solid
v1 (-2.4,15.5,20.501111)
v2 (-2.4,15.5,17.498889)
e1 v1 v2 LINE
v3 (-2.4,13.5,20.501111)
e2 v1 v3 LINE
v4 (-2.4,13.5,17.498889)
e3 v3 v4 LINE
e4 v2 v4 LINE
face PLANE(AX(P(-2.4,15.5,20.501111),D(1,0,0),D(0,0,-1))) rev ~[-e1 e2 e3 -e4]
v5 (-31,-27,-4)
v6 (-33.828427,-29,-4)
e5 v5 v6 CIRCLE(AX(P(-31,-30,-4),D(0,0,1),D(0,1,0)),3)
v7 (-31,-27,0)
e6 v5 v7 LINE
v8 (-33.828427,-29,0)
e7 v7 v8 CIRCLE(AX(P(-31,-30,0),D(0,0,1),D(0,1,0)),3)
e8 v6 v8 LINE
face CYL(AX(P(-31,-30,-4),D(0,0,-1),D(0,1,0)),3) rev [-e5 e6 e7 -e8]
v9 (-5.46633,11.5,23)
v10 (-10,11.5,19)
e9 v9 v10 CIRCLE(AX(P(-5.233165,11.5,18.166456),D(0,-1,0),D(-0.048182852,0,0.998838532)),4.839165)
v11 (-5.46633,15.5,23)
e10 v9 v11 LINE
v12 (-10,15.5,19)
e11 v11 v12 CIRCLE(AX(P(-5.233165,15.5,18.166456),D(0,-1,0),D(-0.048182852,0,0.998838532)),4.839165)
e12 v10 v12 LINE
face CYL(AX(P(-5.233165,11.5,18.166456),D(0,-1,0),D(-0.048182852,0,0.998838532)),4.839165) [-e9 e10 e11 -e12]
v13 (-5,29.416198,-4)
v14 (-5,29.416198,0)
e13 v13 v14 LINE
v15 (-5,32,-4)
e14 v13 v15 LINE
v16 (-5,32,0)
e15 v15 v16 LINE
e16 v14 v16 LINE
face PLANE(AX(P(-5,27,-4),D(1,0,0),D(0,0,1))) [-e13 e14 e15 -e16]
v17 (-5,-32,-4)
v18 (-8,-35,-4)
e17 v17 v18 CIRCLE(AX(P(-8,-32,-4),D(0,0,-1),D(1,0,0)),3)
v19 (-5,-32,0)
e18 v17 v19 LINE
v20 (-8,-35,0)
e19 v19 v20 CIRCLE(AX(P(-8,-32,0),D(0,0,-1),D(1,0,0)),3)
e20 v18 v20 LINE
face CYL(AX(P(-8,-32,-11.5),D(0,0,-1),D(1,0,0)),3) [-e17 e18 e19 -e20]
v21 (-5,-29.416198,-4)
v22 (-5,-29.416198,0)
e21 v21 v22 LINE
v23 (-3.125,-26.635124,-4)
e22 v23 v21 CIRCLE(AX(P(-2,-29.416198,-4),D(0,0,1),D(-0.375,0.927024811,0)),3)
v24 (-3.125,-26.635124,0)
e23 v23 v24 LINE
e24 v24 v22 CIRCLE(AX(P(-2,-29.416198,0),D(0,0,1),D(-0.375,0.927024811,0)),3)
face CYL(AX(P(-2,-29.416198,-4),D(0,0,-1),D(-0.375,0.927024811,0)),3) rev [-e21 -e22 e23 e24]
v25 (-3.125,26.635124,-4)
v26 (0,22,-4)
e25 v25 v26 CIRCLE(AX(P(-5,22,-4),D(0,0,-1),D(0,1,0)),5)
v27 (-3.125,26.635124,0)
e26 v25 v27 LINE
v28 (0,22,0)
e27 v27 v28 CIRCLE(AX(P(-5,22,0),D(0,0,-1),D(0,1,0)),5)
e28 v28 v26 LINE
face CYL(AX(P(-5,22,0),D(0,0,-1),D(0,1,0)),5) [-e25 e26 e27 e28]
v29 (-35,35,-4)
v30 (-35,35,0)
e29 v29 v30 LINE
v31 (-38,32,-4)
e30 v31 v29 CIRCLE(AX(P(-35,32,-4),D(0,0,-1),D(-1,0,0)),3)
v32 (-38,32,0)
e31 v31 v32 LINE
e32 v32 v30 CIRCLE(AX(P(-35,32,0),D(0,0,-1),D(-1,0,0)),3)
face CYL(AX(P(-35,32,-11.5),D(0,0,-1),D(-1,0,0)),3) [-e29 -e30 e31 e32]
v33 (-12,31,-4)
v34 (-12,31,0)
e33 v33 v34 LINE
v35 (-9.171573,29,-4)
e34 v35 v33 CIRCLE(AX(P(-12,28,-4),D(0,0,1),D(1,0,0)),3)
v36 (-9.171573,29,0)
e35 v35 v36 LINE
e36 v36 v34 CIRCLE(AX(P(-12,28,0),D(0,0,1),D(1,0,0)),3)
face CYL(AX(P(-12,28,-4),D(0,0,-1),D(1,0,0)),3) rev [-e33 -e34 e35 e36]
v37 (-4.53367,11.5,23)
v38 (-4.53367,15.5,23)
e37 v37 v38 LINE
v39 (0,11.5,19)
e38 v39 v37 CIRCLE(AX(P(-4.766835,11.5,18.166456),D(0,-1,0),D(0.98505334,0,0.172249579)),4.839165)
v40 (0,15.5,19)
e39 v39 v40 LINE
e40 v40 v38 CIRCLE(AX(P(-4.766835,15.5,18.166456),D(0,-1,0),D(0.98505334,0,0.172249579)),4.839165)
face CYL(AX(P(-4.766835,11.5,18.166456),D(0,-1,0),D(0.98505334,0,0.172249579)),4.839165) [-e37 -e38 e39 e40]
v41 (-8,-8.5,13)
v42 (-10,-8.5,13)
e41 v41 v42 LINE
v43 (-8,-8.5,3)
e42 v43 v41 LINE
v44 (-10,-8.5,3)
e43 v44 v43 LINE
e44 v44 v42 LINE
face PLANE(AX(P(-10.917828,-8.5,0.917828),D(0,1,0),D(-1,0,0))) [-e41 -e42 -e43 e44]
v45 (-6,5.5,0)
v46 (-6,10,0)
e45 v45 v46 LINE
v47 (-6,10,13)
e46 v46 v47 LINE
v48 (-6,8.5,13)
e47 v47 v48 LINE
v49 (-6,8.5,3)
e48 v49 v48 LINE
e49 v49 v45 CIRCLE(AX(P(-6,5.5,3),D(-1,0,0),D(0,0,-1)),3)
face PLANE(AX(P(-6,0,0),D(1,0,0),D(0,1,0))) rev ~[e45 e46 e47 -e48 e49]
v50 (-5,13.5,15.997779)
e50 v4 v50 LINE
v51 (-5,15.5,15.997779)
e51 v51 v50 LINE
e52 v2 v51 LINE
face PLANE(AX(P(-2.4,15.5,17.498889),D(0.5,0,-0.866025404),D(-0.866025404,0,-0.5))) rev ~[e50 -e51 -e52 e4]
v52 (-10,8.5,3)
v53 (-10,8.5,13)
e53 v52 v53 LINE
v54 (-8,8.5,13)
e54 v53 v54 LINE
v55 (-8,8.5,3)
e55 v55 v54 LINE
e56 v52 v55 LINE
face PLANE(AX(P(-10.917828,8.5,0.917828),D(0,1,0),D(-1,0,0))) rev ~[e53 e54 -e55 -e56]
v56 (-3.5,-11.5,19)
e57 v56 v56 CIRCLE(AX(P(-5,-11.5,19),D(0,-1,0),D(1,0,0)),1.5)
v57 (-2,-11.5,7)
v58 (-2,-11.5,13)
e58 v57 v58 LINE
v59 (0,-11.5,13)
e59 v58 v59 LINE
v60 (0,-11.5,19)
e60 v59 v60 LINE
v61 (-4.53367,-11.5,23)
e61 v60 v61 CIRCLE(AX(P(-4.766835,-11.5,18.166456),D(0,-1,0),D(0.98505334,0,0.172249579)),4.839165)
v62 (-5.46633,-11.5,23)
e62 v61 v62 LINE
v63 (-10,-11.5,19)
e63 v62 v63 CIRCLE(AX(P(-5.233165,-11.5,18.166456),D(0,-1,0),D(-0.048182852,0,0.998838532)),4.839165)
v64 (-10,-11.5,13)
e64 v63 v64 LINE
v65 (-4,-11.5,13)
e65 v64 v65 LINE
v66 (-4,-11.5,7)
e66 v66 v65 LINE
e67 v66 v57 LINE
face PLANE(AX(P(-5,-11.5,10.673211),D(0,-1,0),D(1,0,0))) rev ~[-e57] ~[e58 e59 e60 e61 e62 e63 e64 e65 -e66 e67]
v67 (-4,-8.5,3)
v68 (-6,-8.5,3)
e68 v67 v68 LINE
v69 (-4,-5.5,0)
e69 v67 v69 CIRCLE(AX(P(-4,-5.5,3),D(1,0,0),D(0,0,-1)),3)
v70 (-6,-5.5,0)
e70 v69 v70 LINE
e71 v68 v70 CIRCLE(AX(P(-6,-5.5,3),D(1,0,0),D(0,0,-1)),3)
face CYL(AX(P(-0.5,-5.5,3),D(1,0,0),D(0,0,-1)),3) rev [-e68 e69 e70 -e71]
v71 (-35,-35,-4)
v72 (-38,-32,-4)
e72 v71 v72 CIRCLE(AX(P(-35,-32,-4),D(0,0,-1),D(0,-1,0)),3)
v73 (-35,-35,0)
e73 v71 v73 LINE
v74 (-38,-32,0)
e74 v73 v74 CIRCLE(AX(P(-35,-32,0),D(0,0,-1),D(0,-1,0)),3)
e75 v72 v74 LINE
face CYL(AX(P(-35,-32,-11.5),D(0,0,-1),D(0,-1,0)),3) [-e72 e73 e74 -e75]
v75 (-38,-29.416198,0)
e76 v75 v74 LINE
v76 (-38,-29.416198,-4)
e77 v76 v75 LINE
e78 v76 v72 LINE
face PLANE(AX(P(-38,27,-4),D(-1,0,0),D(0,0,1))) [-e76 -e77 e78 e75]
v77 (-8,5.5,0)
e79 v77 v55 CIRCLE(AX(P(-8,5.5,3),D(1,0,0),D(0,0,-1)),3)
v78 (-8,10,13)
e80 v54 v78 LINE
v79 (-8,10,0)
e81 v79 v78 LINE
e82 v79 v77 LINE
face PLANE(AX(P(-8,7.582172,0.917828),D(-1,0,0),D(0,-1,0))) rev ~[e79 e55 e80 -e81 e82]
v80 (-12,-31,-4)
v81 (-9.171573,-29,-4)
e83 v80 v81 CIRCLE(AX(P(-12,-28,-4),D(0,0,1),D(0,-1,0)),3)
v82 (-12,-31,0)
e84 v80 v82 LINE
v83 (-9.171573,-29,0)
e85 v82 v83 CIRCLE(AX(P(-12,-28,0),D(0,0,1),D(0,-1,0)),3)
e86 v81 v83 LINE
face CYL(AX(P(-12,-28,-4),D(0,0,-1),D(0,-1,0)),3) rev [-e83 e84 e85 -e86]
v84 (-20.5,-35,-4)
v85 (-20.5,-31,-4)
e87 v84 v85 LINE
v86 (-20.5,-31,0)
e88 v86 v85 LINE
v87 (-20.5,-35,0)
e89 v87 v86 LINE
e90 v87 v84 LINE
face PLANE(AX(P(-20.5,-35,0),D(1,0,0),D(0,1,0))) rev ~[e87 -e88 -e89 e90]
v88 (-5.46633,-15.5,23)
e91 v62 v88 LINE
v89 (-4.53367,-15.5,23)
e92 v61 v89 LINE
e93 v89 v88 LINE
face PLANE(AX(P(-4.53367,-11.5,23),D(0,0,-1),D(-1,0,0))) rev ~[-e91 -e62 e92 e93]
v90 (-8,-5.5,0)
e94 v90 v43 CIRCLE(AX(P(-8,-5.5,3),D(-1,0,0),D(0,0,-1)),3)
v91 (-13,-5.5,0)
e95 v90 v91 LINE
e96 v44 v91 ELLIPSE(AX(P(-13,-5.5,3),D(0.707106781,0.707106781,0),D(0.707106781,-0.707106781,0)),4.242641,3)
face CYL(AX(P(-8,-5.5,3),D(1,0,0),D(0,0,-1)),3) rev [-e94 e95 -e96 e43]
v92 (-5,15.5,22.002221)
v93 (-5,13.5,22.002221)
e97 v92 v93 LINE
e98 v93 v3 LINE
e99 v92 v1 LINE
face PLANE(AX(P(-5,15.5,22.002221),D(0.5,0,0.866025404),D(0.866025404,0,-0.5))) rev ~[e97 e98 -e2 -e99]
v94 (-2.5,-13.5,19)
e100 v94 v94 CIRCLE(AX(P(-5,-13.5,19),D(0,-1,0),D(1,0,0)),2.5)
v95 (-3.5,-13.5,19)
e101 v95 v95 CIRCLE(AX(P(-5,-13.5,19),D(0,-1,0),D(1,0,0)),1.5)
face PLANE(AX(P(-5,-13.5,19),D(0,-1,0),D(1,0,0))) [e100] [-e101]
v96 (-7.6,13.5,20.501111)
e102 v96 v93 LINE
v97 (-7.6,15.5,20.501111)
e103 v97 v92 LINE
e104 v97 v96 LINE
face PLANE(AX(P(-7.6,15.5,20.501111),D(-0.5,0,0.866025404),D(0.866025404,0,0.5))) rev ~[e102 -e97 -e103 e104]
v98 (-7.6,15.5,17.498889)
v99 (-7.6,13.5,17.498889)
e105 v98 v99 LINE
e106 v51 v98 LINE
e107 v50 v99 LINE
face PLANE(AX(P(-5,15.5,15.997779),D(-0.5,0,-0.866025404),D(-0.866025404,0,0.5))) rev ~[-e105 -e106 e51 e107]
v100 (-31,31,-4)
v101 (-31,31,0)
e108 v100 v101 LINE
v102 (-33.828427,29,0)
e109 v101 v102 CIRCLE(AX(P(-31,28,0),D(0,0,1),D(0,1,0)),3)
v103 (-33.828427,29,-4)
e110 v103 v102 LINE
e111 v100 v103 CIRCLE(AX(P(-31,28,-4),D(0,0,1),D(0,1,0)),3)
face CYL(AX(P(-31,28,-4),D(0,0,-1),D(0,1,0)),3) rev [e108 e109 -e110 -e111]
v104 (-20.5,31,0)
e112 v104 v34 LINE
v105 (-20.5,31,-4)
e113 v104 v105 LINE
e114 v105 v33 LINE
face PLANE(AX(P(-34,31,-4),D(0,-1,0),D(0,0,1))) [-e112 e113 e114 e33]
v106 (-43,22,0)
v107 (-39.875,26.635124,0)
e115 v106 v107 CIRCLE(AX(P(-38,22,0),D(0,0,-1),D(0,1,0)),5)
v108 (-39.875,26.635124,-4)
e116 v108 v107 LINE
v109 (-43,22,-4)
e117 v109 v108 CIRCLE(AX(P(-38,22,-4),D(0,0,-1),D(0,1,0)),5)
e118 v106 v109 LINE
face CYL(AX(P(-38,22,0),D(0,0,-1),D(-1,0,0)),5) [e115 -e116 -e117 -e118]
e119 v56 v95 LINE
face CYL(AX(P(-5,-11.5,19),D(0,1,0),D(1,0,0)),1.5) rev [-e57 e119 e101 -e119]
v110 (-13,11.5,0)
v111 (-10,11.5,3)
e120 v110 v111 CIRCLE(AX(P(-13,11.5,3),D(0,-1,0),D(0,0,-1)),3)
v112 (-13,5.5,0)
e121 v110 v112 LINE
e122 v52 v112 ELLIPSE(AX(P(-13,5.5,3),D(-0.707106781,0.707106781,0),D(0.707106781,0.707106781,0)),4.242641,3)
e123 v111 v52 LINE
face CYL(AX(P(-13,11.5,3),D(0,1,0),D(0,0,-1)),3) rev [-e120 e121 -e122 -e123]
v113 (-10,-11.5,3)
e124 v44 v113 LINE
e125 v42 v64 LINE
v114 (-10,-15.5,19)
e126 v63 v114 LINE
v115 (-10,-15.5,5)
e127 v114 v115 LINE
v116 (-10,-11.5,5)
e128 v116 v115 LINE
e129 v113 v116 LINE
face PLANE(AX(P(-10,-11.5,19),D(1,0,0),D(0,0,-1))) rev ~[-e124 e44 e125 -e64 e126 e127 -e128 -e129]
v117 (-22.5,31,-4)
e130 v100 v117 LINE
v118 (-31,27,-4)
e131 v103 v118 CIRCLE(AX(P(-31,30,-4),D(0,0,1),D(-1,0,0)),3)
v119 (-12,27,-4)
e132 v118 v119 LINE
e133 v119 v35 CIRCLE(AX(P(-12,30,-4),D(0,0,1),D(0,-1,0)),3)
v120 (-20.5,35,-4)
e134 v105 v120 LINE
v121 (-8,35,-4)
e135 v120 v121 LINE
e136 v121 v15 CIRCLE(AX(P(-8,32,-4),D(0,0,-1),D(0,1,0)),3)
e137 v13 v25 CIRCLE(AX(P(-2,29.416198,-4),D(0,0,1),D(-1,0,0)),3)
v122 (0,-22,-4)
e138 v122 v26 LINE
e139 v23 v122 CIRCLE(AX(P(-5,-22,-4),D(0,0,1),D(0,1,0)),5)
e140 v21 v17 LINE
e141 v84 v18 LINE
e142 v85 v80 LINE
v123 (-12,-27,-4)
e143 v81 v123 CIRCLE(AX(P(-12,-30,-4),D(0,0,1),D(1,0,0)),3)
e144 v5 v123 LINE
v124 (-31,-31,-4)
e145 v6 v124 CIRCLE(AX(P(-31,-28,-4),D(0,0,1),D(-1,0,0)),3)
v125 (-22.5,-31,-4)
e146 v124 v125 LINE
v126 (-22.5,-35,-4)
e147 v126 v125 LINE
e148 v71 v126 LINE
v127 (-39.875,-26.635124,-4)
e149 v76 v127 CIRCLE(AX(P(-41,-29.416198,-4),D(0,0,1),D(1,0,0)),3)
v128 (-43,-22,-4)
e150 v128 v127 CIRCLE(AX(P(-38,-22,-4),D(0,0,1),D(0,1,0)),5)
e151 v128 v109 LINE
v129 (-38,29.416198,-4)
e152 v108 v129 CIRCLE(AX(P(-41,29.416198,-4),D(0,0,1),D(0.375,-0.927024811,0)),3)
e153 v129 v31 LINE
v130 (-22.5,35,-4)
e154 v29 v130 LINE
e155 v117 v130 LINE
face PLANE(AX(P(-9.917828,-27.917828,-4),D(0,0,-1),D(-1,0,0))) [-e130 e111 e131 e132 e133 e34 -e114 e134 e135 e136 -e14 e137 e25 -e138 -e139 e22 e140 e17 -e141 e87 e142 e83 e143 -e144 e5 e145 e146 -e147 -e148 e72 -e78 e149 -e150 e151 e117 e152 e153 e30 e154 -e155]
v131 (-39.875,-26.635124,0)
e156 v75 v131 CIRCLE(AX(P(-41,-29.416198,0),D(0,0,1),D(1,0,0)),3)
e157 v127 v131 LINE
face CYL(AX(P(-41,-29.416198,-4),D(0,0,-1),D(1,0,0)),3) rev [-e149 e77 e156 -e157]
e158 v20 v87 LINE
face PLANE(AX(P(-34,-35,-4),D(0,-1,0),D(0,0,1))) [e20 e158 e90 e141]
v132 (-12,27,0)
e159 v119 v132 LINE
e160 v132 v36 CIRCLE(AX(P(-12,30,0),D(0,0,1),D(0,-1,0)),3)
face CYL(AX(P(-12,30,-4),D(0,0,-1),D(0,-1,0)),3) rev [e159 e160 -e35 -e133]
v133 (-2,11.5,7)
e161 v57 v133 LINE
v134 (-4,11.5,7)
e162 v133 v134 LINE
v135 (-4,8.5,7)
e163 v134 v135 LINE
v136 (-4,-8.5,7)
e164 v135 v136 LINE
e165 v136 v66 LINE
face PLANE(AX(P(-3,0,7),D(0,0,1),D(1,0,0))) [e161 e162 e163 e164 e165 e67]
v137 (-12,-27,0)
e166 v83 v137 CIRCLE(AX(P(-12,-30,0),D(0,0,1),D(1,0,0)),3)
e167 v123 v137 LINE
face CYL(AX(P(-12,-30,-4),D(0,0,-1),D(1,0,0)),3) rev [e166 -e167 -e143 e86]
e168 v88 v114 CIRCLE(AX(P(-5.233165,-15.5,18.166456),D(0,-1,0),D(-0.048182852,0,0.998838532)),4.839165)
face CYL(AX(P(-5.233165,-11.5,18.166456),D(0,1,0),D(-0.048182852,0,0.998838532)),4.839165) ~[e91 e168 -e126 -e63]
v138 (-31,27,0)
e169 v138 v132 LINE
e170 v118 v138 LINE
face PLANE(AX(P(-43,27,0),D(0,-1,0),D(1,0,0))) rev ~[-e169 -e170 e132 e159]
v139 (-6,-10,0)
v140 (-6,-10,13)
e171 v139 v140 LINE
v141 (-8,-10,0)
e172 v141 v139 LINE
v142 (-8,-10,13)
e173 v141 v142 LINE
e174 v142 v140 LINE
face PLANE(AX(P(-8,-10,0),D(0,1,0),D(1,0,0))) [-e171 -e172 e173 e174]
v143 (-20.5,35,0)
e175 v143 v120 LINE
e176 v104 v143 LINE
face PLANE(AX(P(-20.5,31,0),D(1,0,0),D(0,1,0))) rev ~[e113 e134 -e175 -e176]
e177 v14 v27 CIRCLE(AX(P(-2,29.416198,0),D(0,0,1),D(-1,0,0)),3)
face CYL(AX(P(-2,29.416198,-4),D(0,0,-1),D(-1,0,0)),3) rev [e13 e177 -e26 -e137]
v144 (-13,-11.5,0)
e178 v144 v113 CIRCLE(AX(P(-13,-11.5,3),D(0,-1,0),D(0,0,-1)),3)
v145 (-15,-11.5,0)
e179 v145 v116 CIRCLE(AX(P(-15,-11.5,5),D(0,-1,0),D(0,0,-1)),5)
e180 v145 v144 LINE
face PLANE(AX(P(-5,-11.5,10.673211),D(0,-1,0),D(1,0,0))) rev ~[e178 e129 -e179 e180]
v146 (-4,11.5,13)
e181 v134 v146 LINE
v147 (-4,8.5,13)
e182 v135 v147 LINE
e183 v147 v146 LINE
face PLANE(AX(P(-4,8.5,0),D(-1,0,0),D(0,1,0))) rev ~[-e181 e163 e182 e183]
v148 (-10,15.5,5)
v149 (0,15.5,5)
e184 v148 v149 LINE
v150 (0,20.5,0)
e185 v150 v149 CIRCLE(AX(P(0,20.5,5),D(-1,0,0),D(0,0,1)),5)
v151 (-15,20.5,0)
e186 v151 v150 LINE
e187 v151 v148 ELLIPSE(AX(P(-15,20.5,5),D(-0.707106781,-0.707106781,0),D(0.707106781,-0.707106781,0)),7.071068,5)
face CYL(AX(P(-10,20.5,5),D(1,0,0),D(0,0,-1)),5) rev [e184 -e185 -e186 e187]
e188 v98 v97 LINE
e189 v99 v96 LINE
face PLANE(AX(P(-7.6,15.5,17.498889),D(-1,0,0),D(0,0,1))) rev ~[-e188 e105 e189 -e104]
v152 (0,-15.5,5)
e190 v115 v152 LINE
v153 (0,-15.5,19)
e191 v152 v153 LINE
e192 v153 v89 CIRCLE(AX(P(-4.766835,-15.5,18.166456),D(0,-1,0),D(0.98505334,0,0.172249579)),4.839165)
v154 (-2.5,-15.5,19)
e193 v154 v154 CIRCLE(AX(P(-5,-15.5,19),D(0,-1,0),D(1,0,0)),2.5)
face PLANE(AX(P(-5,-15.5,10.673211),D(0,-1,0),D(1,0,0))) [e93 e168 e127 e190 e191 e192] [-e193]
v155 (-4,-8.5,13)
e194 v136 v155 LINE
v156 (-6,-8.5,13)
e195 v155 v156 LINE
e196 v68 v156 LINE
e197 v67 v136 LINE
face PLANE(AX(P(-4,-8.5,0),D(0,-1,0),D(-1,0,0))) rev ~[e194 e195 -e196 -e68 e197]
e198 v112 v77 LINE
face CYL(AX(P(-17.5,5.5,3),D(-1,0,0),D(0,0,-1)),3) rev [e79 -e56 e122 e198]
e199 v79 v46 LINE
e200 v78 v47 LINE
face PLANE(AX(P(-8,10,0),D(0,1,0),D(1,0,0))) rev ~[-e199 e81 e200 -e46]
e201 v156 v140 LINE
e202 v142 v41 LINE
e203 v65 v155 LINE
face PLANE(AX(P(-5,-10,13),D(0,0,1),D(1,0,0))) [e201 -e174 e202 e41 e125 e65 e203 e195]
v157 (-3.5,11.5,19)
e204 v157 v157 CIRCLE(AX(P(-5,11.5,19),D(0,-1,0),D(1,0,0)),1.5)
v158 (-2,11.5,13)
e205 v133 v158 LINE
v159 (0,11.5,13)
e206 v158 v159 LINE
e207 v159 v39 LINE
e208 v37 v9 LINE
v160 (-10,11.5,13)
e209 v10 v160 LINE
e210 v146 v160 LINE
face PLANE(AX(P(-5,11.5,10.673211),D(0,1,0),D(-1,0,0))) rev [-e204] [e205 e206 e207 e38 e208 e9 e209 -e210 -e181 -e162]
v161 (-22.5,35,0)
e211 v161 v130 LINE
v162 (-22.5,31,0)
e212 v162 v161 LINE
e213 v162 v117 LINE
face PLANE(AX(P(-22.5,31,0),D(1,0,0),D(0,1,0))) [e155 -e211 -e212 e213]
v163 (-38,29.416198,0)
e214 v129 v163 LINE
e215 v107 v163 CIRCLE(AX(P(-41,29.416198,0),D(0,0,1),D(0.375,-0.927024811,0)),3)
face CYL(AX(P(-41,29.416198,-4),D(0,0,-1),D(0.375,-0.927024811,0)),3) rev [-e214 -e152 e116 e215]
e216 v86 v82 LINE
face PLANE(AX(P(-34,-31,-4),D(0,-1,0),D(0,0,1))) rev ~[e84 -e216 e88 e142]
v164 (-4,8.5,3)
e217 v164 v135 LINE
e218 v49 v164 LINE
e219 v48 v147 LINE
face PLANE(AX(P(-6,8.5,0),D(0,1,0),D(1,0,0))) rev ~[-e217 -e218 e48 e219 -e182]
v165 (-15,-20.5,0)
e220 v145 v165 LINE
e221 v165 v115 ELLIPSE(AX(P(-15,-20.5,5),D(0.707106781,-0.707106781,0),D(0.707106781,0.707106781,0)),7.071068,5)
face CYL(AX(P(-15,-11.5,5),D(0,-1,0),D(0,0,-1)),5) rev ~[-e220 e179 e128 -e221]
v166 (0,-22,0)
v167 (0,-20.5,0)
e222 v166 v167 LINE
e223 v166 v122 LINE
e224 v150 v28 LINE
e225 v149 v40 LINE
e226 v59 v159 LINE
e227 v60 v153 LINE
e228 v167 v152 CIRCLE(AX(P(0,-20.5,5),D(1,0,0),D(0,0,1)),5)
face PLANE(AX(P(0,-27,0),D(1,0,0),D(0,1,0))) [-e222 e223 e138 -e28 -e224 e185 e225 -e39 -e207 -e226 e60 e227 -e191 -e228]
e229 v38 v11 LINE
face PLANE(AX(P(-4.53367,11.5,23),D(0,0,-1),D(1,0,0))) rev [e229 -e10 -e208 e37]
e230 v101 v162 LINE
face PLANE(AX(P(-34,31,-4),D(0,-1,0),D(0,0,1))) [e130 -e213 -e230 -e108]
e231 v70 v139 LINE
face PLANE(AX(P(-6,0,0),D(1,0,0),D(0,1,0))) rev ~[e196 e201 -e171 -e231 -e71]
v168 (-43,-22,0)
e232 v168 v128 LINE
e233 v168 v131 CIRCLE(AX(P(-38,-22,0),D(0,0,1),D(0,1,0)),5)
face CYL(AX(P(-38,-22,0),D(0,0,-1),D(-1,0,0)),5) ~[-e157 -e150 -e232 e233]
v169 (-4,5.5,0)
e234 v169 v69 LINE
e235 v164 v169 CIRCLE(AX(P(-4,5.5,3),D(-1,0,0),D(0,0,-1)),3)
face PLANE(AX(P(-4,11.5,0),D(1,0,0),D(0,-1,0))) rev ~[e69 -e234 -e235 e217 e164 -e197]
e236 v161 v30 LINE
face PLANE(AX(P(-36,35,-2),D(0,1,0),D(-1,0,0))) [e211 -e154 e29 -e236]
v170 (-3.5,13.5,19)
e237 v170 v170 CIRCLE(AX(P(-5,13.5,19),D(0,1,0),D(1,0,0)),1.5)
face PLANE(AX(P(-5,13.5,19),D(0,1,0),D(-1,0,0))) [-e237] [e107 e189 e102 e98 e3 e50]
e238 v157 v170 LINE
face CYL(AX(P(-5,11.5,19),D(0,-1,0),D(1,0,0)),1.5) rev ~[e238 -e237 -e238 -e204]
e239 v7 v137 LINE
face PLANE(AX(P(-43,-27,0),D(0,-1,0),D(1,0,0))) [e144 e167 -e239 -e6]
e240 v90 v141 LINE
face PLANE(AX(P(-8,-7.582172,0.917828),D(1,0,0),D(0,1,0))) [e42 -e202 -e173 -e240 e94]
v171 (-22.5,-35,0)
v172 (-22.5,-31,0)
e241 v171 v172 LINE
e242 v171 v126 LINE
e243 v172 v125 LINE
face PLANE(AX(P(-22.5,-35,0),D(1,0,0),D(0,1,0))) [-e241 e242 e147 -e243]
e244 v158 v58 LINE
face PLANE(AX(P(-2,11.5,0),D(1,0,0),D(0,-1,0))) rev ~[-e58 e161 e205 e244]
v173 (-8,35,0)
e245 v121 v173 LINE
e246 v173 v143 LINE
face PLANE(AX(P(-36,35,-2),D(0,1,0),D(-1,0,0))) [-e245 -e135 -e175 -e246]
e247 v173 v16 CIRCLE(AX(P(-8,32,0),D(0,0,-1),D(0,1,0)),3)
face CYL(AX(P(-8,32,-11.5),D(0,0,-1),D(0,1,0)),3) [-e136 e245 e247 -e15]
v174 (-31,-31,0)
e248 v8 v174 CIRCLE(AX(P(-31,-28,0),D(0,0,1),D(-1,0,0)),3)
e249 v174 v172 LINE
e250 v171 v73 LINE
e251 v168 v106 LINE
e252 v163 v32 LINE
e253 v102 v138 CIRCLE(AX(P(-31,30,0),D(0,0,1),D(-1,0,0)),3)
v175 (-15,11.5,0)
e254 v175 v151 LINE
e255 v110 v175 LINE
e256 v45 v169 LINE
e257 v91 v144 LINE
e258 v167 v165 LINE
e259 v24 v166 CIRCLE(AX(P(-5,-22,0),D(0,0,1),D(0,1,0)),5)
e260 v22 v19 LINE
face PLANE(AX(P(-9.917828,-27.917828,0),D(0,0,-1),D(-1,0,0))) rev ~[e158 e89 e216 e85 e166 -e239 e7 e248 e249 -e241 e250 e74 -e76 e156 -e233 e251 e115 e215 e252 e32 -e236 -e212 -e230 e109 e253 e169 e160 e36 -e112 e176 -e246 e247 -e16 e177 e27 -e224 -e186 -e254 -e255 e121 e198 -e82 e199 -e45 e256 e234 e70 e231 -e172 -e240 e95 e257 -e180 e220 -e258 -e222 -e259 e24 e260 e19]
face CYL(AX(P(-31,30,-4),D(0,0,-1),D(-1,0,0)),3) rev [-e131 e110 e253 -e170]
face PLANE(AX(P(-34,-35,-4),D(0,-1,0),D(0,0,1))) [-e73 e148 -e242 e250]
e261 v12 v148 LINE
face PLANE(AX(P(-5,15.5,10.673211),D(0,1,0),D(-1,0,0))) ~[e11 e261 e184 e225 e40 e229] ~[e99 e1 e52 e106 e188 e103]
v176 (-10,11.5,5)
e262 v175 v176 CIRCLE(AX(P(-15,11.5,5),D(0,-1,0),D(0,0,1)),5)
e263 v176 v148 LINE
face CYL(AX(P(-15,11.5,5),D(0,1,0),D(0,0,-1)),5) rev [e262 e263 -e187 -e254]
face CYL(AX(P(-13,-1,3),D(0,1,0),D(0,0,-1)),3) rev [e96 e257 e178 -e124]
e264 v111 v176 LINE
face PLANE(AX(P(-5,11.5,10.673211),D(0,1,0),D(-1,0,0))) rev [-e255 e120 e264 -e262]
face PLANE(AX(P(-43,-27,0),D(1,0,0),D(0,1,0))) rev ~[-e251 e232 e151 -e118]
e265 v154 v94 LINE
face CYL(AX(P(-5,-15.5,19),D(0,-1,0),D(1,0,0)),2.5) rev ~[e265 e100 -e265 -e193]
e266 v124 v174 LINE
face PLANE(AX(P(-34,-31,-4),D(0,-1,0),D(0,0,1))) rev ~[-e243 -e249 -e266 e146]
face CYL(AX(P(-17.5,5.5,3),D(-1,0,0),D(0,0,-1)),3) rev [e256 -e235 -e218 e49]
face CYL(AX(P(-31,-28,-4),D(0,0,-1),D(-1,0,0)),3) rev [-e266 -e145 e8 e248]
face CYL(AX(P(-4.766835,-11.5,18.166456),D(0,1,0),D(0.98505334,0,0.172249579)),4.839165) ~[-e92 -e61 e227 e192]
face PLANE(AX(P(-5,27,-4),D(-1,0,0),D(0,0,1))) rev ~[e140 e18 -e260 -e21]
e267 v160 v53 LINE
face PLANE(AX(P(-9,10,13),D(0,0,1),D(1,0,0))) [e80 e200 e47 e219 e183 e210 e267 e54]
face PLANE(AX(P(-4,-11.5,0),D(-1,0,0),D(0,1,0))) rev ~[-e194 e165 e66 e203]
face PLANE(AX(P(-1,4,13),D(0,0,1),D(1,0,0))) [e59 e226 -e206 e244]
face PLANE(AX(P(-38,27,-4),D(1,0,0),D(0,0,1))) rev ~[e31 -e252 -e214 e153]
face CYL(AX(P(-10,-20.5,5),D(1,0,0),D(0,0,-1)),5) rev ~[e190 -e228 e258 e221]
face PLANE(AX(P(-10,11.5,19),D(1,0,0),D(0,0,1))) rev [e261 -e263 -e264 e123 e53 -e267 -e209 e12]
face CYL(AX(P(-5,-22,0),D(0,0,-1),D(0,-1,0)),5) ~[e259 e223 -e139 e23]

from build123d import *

# Parameters (mm, degrees)
F1_R          = 1.5
F2_DEPTH      = 4
F4_W          = 43
F4_H          = 54
F5_DEPTH      = 4
F6_R          = 5
F7_W          = 4
F7_H          = 4
F8_DEPTH      = 8
F8_DEPTH_BACK = 62
F9_W          = 4
F9_H          = 4
F10_DEPTH     = 25
F11_W         = 2
F11_H         = 4
F12_DEPTH     = 5
F11_H_2       = 15
F11_H_3       = 8
F11_H_4       = 1.5
F13_DEPTH     = 13
F14_DEPTH     = 7
F15_T1_DEPTH  = 3
F15_T3_DEPTH  = 3
F15_T5_DEPTH  = 2
F15_T7_DEPTH  = 4
F15_T12_DEPTH = 17
F15_T17_DEPTH = 17
F15_T22_DEPTH = 17
F15_T28_DEPTH = 9.5
F15_T33_DEPTH = 9.5
F15_T38_DEPTH = 17
F15_T45_DEPTH = 9.5
F15_T49_DEPTH = 10.5
F15_T56_DEPTH = 10.5
F15_T60_DEPTH = 9.5
F15_T63_DEPTH = 19
F16_R         = 2.5
F16_R_2       = 1.5
F17_DEPTH     = 2
F18_R         = 1.5
F19_DEPTH     = 2


# Not quite as in the source:
# - a fillet or chamfer that OpenCascade refuses, or shapes differently, is made with other operations: its cross-section is extruded or revolved along the edge and cut away or added


with BuildPart() as f2:
    # F1 (on offset) → F2 (new body)
    with BuildSketch(Plane.XZ.offset(11.5)):
        with BuildLine():
            Line((-10, 0), (0, 0))
            Line((0, 0), (0, 19))
            ThreePointArc((0, 19), (-1.5652731311, 21.7951628703), (-4.5336704997, 23))
            Line((-4.5336704997, 23), (-5, 23))
            Line((-5, 23), (-5.4663295003, 23))
            ThreePointArc((-5.4663295003, 23), (-8.4347268689, 21.7951628703), (-10, 19))
            Line((-10, 19), (-10, 0))
        make_face()
        with Locations((-5, 19)):
            Circle(F1_R, mode=Mode.SUBTRACT)
    extrude(amount=F2_DEPTH)


with BuildPart() as f3_1:
    # F3: instance of F2
    add(f2.part.mirror(Plane.XZ))


with BuildPart() as f2_1:
    add(f2.part)

    add(f3_1.part)  # F5 merges F3_1
    # F4 (on Top) → F5 (join)
    with BuildSketch(Plane.XY):
        with Locations((-21.5, 0)):
            Rectangle(F4_W, F4_H)
    extrude(amount=-F5_DEPTH)

    # F6
    f6_edges = [f2_1.edges().sort_by_distance(p)[0] for p in [
        (-5, -15.5, 0),
        (-5, 15.5, 0),
        (-10, 13.5, 0),
        (-10, -13.5, 0),
        (-43, 27, -2),
        (-43, -27, -2),
        (0, -27, -2),
        (0, 27, -2),
    ]]
    fillet(f6_edges, radius=F6_R)

    # F7 (on face) → F8 (join, two sides)
    with BuildSketch(Plane(origin=(0, 27, 0), x_dir=(-1, 0, 0), z_dir=(0, 1, 0))) as f8_sk:
        with Locations((36, -2)):
            Rectangle(F7_W, F7_H)
        with Locations((7, -2)):
            Rectangle(F7_W, F7_H)
    extrude(amount=F8_DEPTH)
    extrude(f8_sk.sketch, amount=-F8_DEPTH_BACK)

    # F9 (on face) → F10 (join)
    with BuildSketch(Plane.YZ.offset(-34)):
        with Locations((-33, -2)):
            Rectangle(F9_W, F9_H)
        with Locations((33, -2)):
            Rectangle(F9_W, F9_H)
    extrude(amount=F10_DEPTH)

    # F11 (on face) → F12 (cut)
    with BuildSketch(Plane.XY):
        with Locations((-21.5, -33)):
            Rectangle(F11_W, F11_H)
        with Locations((-21.5, 33)):
            Rectangle(F11_W, F11_H)
    extrude(amount=-F12_DEPTH, mode=Mode.SUBTRACT)

    # F11 (on face) → F13 (join)
    with BuildSketch(Plane.XY):
        with Locations((-1, 4)):
            Rectangle(F11_W, F11_H_2)
        with Locations((-1, -7.5)):
            Rectangle(F11_W, F11_H_3)
        Polygon((-6, -10), (-6, -11.5), (-4, -11.5), (-4, -8.5), (-6, -8.5), align=None)
        with Locations((-7, -10.75)):
            Rectangle(F11_W, F11_H_4)
        Polygon((-10, -8.5), (-10, -11.5), (-8, -11.5), (-8, -10), (-8, -8.5), align=None)
        Polygon((-8, 11.5), (-10, 11.5), (-10, 8.5), (-8, 8.5), (-8, 10), align=None)
        with Locations((-7, 10.75)):
            Rectangle(F11_W, F11_H_4)
        Polygon((-6, 8.5), (-4, 8.5), (-4, 11.5), (-6, 11.5), (-6, 10), align=None)
    extrude(amount=F13_DEPTH)

    # F11 (on face) → F14 (join)
    with BuildSketch(Plane.XY):
        Polygon((-4, -8.5), (-4, -11.5), (-2, -11.5), (-2, -3.5), (-2, 11.5), (-4, 11.5), (-4, 8.5), align=None)
    extrude(amount=F14_DEPTH)

    # F15: fillet of radius 3 on 22 edges, made by hand

    # F15_s2 → F15_t1 (join)
    with BuildSketch(Plane.XZ.offset(8.5)):
        with BuildLine():
            ThreePointArc((-13, 0), (-10.8786796564, 0.8786796564), (-10, 3))
            Line((-10, 3), (-10, 0))
            Line((-10, 0), (-13, 0))
        make_face()
    extrude(amount=F15_T1_DEPTH)

    # F15_s4 → F15_t3 (join)
    with BuildSketch(Plane.XZ.offset(-11.5)):
        with BuildLine():
            ThreePointArc((-13, 0), (-10.8786796564, 0.8786796564), (-10, 3))
            Line((-10, 3), (-10, 0))
            Line((-10, 0), (-13, 0))
        make_face()
    extrude(amount=F15_T3_DEPTH)

    # F15_s6 → F15_t5 (join)
    with BuildSketch(Plane.YZ.offset(-10)):
        with BuildLine():
            ThreePointArc((-5.5, 0), (-7.6213203436, 0.8786796564), (-8.5, 3))
            Line((-8.5, 3), (-8.5, 0))
            Line((-8.5, 0), (-5.5, 0))
        make_face()
        with BuildLine():
            ThreePointArc((5.5, 0), (7.6213203436, 0.8786796564), (8.5, 3))
            Line((8.5, 3), (8.5, 0))
            Line((8.5, 0), (5.5, 0))
        make_face()
    extrude(amount=F15_T5_DEPTH)

    # F15_s8 → F15_t7 (join)
    with BuildSketch(Plane.XY.offset(-4)):
        with BuildLine():
            ThreePointArc((-9, -30), (-9.8786796564, -27.8786796564), (-12, -27))
            Line((-12, -27), (-9, -27))
            Line((-9, -27), (-9, -30))
        make_face()
        with BuildLine():
            ThreePointArc((-31, -27), (-33.1213203436, -27.8786796564), (-34, -30))
            Line((-34, -30), (-34, -27))
            Line((-34, -27), (-31, -27))
        make_face()
        with BuildLine():
            ThreePointArc((-34, -28), (-33.1213203436, -30.1213203436), (-31, -31))
            Line((-31, -31), (-34, -31))
            Line((-34, -31), (-34, -28))
        make_face()
        with BuildLine():
            ThreePointArc((-12, -31), (-9.8786796564, -30.1213203436), (-9, -28))
            Line((-9, -28), (-9, -31))
            Line((-9, -31), (-12, -31))
        make_face()
        with BuildLine():
            ThreePointArc((-38, -29.4161984871), (-38.5125314072, -27.739147504), (-39.875, -26.6351240544))
            ThreePointArc((-39.875, -26.6351240544), (-38.9550863123, -26.9079333875), (-38, -27))
            Line((-38, -27), (-38, -29.4161984871))
        make_face()
        with BuildLine():
            ThreePointArc((-3.125, -26.6351240544), (-4.4874685928, -27.739147504), (-5, -29.4161984871))
            Line((-5, -29.4161984871), (-5, -27))
            ThreePointArc((-5, -27), (-4.0449136877, -26.9079333875), (-3.125, -26.6351240544))
        make_face()
        with BuildLine():
            ThreePointArc((-39.875, 26.6351240544), (-38.5125314072, 27.739147504), (-38, 29.4161984871))
            Line((-38, 29.4161984871), (-38, 27))
            ThreePointArc((-38, 27), (-38.9550863123, 26.9079333875), (-39.875, 26.6351240544))
        make_face()
        with BuildLine():
            ThreePointArc((-12, 27), (-9.8786796564, 27.8786796564), (-9, 30))
            Line((-9, 30), (-9, 27))
            Line((-9, 27), (-12, 27))
        make_face()
        with BuildLine():
            ThreePointArc((-5, 29.4161984871), (-4.4874685928, 27.739147504), (-3.125, 26.6351240544))
            ThreePointArc((-3.125, 26.6351240544), (-4.0449136877, 26.9079333875), (-5, 27))
            Line((-5, 27), (-5, 29.4161984871))
        make_face()
        with BuildLine():
            ThreePointArc((-34, 30), (-33.1213203436, 27.8786796564), (-31, 27))
            Line((-31, 27), (-34, 27))
            Line((-34, 27), (-34, 30))
        make_face()
        with BuildLine():
            ThreePointArc((-31, 31), (-33.1213203436, 30.1213203436), (-34, 28))
            Line((-34, 28), (-34, 31))
            Line((-34, 31), (-31, 31))
        make_face()
        with BuildLine():
            ThreePointArc((-9, 28), (-9.8786796564, 30.1213203436), (-12, 31))
            Line((-12, 31), (-9, 31))
            Line((-9, 31), (-9, 28))
        make_face()
    extrude(amount=F15_T7_DEPTH)


with BuildPart() as f15_tool10:
    # F15_s11 → F15_t12 (new body)
    with BuildSketch(Plane.YZ.offset(-0.5)):
        with BuildLine():
            ThreePointArc((-5.5, 0), (-7.6213203436, 0.8786796564), (-8.5, 3))
            Line((-8.5, 3), (-8.5, 0))
            Line((-8.5, 0), (-5.5, 0))
        make_face()
    extrude(amount=-F15_T12_DEPTH)

    split(bisect_by=Plane.YZ.offset(-6), keep=Keep.TOP)


with BuildPart() as f2_2:
    add(f2_1.part)

    # F15_t9: union F15_tool10
    add(f15_tool10.part)


with BuildPart() as f15_tool15:
    # F15_s16 → F15_t17 (new body)
    with BuildSketch(Plane.YZ.offset(-17.5)):
        with BuildLine():
            ThreePointArc((5.5, 0), (7.6213203436, 0.8786796564), (8.5, 3))
            Line((8.5, 3), (8.5, 0))
            Line((8.5, 0), (5.5, 0))
        make_face()
    extrude(amount=F15_T17_DEPTH)

    split(bisect_by=Plane.YZ.offset(-6), keep=Keep.TOP)


with BuildPart() as f2_3:
    add(f2_2.part)

    # F15_t14: union F15_tool15
    add(f15_tool15.part)


with BuildPart() as f15_tool20:
    # F15_s21 → F15_t22 (new body)
    with BuildSketch(Plane.YZ.offset(-13.5)):
        with BuildLine():
            ThreePointArc((5.5, 0), (7.6213203436, 0.8786796564), (8.5, 3))
            Line((8.5, 3), (8.5, 0))
            Line((8.5, 0), (5.5, 0))
        make_face()
    extrude(amount=F15_T22_DEPTH)

    split(bisect_by=Plane.YZ.offset(-10), keep=Keep.TOP)

    split(bisect_by=Plane.YZ.offset(-8), keep=Keep.BOTTOM)


with BuildPart() as f2_4:
    add(f2_3.part)

    # F15_t19: union F15_tool20
    add(f15_tool20.part)


with BuildPart() as f15_tool26:
    # F15_s27 → F15_t28 (new body)
    with BuildSketch(Plane.YZ.offset(-6)):
        with BuildLine():
            ThreePointArc((5.5, 0), (7.6213203436, 0.8786796564), (8.5, 3))
            Line((8.5, 3), (8.5, 0))
            Line((8.5, 0), (5.5, 0))
        make_face()
    extrude(amount=F15_T28_DEPTH)

    split(bisect_by=Plane.YZ, keep=Keep.BOTTOM)


with BuildPart() as f2_5:
    add(f2_4.part)

    # F15_t25: union F15_tool26
    add(f15_tool26.part)


with BuildPart() as f15_tool31:
    # F15_s32 → F15_t33 (new body)
    with BuildSketch(Plane.YZ.offset(3.5)):
        with BuildLine():
            ThreePointArc((-5.5, 0), (-7.6213203436, 0.8786796564), (-8.5, 3))
            Line((-8.5, 3), (-8.5, 0))
            Line((-8.5, 0), (-5.5, 0))
        make_face()
    extrude(amount=-F15_T33_DEPTH)

    split(bisect_by=Plane.YZ, keep=Keep.BOTTOM)


with BuildPart() as f2_6:
    add(f2_5.part)

    # F15_t30: union F15_tool31
    add(f15_tool31.part)


with BuildPart() as f15_tool36:
    # F15_s37 → F15_t38 (new body)
    with BuildSketch(Plane.YZ.offset(3.5)):
        with BuildLine():
            ThreePointArc((-5.5, 0), (-7.6213203436, 0.8786796564), (-8.5, 3))
            Line((-8.5, 3), (-8.5, 0))
            Line((-8.5, 0), (-5.5, 0))
        make_face()
    extrude(amount=-F15_T38_DEPTH)

    split(bisect_by=Plane.YZ.offset(-8), keep=Keep.BOTTOM)

    split(bisect_by=Plane.YZ.offset(-10), keep=Keep.TOP)


with BuildPart() as f2_7:
    add(f2_6.part)

    # F15_t35: union F15_tool36
    add(f15_tool36.part)


with BuildPart() as f15_tool43:
    # F15_s44 → F15_t45 (new body)
    with BuildSketch(Plane.YZ.offset(-8)):
        with BuildLine():
            ThreePointArc((-5.5, 0), (-7.6213203436, 0.8786796564), (-8.5, 3))
            Line((-8.5, 3), (-8.5, 0))
            Line((-8.5, 0), (-5.5, 0))
        make_face()
    extrude(amount=-F15_T45_DEPTH)

    split(bisect_by=Plane.YZ.offset(-10), keep=Keep.BOTTOM)


with BuildPart() as f15_tool47:
    # F15_s48 → F15_t49 (new body)
    with BuildSketch(Plane.XZ.offset(1)):
        with BuildLine():
            ThreePointArc((-13, 0), (-10.8786796564, 0.8786796564), (-10, 3))
            Line((-10, 3), (-10, 0))
            Line((-10, 0), (-13, 0))
        make_face()
    extrude(amount=F15_T49_DEPTH)

    split(bisect_by=Plane.XZ.offset(8.5), keep=Keep.BOTTOM)


with BuildPart() as f15_tool43_1:
    add(f15_tool43.part)

    # F15_t51: intersect F15_tool47
    add(f15_tool47.part, mode=Mode.INTERSECT)


with BuildPart() as f2_8:
    add(f2_7.part)

    # F15_t41: union F15_tool43
    add(f15_tool43_1.part)


with BuildPart() as f15_tool54:
    # F15_s55 → F15_t56 (new body)
    with BuildSketch(Plane.XZ.offset(-11.5)):
        with BuildLine():
            ThreePointArc((-13, 0), (-10.8786796564, 0.8786796564), (-10, 3))
            Line((-10, 3), (-10, 0))
            Line((-10, 0), (-13, 0))
        make_face()
    extrude(amount=F15_T56_DEPTH)

    split(bisect_by=Plane.XZ.offset(-8.5), keep=Keep.TOP)


with BuildPart() as f15_tool58:
    # F15_s59 → F15_t60 (new body)
    with BuildSketch(Plane.YZ.offset(-17.5)):
        with BuildLine():
            ThreePointArc((5.5, 0), (7.6213203436, 0.8786796564), (8.5, 3))
            Line((8.5, 3), (8.5, 0))
            Line((8.5, 0), (5.5, 0))
        make_face()
    extrude(amount=F15_T60_DEPTH)

    split(bisect_by=Plane.YZ.offset(-10), keep=Keep.BOTTOM)


with BuildPart() as f15_tool54_1:
    add(f15_tool54.part)

    # F15_t62: intersect F15_tool58
    add(f15_tool58.part, mode=Mode.INTERSECT)


with BuildPart() as f2_9:
    add(f2_8.part)

    # F15_t52: union F15_tool54
    add(f15_tool54_1.part)

    # F15_s64 → F15_t63 (cut)
    with BuildSketch(Plane.XY.offset(-11.5)):
        with BuildLine():
            ThreePointArc((-5, -32), (-5.8786796564, -34.1213203436), (-8, -35))
            Line((-8, -35), (-5, -35))
            Line((-5, -35), (-5, -32))
        make_face()
        with BuildLine():
            ThreePointArc((-35, -35), (-37.1213203436, -34.1213203436), (-38, -32))
            Line((-38, -32), (-38, -35))
            Line((-38, -35), (-35, -35))
        make_face()
        with BuildLine():
            ThreePointArc((-38, 32), (-37.1213203436, 34.1213203436), (-35, 35))
            Line((-35, 35), (-38, 35))
            Line((-38, 35), (-38, 32))
        make_face()
        with BuildLine():
            ThreePointArc((-8, 35), (-5.8786796564, 34.1213203436), (-5, 32))
            Line((-5, 32), (-5, 35))
            Line((-5, 35), (-8, 35))
        make_face()
    extrude(amount=F15_T63_DEPTH, mode=Mode.SUBTRACT)

    # F16 (on face) → F17 (cut)
    with BuildSketch(Plane.XZ.offset(15.5)):
        with Locations((-5, 19)):
            Circle(F16_R)
        with Locations((-5, 19)):
            Circle(F16_R_2, mode=Mode.SUBTRACT)
    extrude(amount=-F17_DEPTH, mode=Mode.SUBTRACT)

    # F18 (on face) → F19 (cut)
    with BuildSketch(Plane(origin=(0, 15.5, 0), x_dir=(-1, 0, 0), z_dir=(0, 1, 0))):
        Polygon((7.6, 17.4988893001), (7.6, 20.5011106999), (5, 22.0022213998), (2.4, 20.5011106999), (2.4, 17.4988893001), (5, 15.9977786002), align=None)
        with Locations((5, 19)):
            Circle(F18_R, mode=Mode.SUBTRACT)
    extrude(amount=-F19_DEPTH, mode=Mode.SUBTRACT)


solid = f2_9.part
